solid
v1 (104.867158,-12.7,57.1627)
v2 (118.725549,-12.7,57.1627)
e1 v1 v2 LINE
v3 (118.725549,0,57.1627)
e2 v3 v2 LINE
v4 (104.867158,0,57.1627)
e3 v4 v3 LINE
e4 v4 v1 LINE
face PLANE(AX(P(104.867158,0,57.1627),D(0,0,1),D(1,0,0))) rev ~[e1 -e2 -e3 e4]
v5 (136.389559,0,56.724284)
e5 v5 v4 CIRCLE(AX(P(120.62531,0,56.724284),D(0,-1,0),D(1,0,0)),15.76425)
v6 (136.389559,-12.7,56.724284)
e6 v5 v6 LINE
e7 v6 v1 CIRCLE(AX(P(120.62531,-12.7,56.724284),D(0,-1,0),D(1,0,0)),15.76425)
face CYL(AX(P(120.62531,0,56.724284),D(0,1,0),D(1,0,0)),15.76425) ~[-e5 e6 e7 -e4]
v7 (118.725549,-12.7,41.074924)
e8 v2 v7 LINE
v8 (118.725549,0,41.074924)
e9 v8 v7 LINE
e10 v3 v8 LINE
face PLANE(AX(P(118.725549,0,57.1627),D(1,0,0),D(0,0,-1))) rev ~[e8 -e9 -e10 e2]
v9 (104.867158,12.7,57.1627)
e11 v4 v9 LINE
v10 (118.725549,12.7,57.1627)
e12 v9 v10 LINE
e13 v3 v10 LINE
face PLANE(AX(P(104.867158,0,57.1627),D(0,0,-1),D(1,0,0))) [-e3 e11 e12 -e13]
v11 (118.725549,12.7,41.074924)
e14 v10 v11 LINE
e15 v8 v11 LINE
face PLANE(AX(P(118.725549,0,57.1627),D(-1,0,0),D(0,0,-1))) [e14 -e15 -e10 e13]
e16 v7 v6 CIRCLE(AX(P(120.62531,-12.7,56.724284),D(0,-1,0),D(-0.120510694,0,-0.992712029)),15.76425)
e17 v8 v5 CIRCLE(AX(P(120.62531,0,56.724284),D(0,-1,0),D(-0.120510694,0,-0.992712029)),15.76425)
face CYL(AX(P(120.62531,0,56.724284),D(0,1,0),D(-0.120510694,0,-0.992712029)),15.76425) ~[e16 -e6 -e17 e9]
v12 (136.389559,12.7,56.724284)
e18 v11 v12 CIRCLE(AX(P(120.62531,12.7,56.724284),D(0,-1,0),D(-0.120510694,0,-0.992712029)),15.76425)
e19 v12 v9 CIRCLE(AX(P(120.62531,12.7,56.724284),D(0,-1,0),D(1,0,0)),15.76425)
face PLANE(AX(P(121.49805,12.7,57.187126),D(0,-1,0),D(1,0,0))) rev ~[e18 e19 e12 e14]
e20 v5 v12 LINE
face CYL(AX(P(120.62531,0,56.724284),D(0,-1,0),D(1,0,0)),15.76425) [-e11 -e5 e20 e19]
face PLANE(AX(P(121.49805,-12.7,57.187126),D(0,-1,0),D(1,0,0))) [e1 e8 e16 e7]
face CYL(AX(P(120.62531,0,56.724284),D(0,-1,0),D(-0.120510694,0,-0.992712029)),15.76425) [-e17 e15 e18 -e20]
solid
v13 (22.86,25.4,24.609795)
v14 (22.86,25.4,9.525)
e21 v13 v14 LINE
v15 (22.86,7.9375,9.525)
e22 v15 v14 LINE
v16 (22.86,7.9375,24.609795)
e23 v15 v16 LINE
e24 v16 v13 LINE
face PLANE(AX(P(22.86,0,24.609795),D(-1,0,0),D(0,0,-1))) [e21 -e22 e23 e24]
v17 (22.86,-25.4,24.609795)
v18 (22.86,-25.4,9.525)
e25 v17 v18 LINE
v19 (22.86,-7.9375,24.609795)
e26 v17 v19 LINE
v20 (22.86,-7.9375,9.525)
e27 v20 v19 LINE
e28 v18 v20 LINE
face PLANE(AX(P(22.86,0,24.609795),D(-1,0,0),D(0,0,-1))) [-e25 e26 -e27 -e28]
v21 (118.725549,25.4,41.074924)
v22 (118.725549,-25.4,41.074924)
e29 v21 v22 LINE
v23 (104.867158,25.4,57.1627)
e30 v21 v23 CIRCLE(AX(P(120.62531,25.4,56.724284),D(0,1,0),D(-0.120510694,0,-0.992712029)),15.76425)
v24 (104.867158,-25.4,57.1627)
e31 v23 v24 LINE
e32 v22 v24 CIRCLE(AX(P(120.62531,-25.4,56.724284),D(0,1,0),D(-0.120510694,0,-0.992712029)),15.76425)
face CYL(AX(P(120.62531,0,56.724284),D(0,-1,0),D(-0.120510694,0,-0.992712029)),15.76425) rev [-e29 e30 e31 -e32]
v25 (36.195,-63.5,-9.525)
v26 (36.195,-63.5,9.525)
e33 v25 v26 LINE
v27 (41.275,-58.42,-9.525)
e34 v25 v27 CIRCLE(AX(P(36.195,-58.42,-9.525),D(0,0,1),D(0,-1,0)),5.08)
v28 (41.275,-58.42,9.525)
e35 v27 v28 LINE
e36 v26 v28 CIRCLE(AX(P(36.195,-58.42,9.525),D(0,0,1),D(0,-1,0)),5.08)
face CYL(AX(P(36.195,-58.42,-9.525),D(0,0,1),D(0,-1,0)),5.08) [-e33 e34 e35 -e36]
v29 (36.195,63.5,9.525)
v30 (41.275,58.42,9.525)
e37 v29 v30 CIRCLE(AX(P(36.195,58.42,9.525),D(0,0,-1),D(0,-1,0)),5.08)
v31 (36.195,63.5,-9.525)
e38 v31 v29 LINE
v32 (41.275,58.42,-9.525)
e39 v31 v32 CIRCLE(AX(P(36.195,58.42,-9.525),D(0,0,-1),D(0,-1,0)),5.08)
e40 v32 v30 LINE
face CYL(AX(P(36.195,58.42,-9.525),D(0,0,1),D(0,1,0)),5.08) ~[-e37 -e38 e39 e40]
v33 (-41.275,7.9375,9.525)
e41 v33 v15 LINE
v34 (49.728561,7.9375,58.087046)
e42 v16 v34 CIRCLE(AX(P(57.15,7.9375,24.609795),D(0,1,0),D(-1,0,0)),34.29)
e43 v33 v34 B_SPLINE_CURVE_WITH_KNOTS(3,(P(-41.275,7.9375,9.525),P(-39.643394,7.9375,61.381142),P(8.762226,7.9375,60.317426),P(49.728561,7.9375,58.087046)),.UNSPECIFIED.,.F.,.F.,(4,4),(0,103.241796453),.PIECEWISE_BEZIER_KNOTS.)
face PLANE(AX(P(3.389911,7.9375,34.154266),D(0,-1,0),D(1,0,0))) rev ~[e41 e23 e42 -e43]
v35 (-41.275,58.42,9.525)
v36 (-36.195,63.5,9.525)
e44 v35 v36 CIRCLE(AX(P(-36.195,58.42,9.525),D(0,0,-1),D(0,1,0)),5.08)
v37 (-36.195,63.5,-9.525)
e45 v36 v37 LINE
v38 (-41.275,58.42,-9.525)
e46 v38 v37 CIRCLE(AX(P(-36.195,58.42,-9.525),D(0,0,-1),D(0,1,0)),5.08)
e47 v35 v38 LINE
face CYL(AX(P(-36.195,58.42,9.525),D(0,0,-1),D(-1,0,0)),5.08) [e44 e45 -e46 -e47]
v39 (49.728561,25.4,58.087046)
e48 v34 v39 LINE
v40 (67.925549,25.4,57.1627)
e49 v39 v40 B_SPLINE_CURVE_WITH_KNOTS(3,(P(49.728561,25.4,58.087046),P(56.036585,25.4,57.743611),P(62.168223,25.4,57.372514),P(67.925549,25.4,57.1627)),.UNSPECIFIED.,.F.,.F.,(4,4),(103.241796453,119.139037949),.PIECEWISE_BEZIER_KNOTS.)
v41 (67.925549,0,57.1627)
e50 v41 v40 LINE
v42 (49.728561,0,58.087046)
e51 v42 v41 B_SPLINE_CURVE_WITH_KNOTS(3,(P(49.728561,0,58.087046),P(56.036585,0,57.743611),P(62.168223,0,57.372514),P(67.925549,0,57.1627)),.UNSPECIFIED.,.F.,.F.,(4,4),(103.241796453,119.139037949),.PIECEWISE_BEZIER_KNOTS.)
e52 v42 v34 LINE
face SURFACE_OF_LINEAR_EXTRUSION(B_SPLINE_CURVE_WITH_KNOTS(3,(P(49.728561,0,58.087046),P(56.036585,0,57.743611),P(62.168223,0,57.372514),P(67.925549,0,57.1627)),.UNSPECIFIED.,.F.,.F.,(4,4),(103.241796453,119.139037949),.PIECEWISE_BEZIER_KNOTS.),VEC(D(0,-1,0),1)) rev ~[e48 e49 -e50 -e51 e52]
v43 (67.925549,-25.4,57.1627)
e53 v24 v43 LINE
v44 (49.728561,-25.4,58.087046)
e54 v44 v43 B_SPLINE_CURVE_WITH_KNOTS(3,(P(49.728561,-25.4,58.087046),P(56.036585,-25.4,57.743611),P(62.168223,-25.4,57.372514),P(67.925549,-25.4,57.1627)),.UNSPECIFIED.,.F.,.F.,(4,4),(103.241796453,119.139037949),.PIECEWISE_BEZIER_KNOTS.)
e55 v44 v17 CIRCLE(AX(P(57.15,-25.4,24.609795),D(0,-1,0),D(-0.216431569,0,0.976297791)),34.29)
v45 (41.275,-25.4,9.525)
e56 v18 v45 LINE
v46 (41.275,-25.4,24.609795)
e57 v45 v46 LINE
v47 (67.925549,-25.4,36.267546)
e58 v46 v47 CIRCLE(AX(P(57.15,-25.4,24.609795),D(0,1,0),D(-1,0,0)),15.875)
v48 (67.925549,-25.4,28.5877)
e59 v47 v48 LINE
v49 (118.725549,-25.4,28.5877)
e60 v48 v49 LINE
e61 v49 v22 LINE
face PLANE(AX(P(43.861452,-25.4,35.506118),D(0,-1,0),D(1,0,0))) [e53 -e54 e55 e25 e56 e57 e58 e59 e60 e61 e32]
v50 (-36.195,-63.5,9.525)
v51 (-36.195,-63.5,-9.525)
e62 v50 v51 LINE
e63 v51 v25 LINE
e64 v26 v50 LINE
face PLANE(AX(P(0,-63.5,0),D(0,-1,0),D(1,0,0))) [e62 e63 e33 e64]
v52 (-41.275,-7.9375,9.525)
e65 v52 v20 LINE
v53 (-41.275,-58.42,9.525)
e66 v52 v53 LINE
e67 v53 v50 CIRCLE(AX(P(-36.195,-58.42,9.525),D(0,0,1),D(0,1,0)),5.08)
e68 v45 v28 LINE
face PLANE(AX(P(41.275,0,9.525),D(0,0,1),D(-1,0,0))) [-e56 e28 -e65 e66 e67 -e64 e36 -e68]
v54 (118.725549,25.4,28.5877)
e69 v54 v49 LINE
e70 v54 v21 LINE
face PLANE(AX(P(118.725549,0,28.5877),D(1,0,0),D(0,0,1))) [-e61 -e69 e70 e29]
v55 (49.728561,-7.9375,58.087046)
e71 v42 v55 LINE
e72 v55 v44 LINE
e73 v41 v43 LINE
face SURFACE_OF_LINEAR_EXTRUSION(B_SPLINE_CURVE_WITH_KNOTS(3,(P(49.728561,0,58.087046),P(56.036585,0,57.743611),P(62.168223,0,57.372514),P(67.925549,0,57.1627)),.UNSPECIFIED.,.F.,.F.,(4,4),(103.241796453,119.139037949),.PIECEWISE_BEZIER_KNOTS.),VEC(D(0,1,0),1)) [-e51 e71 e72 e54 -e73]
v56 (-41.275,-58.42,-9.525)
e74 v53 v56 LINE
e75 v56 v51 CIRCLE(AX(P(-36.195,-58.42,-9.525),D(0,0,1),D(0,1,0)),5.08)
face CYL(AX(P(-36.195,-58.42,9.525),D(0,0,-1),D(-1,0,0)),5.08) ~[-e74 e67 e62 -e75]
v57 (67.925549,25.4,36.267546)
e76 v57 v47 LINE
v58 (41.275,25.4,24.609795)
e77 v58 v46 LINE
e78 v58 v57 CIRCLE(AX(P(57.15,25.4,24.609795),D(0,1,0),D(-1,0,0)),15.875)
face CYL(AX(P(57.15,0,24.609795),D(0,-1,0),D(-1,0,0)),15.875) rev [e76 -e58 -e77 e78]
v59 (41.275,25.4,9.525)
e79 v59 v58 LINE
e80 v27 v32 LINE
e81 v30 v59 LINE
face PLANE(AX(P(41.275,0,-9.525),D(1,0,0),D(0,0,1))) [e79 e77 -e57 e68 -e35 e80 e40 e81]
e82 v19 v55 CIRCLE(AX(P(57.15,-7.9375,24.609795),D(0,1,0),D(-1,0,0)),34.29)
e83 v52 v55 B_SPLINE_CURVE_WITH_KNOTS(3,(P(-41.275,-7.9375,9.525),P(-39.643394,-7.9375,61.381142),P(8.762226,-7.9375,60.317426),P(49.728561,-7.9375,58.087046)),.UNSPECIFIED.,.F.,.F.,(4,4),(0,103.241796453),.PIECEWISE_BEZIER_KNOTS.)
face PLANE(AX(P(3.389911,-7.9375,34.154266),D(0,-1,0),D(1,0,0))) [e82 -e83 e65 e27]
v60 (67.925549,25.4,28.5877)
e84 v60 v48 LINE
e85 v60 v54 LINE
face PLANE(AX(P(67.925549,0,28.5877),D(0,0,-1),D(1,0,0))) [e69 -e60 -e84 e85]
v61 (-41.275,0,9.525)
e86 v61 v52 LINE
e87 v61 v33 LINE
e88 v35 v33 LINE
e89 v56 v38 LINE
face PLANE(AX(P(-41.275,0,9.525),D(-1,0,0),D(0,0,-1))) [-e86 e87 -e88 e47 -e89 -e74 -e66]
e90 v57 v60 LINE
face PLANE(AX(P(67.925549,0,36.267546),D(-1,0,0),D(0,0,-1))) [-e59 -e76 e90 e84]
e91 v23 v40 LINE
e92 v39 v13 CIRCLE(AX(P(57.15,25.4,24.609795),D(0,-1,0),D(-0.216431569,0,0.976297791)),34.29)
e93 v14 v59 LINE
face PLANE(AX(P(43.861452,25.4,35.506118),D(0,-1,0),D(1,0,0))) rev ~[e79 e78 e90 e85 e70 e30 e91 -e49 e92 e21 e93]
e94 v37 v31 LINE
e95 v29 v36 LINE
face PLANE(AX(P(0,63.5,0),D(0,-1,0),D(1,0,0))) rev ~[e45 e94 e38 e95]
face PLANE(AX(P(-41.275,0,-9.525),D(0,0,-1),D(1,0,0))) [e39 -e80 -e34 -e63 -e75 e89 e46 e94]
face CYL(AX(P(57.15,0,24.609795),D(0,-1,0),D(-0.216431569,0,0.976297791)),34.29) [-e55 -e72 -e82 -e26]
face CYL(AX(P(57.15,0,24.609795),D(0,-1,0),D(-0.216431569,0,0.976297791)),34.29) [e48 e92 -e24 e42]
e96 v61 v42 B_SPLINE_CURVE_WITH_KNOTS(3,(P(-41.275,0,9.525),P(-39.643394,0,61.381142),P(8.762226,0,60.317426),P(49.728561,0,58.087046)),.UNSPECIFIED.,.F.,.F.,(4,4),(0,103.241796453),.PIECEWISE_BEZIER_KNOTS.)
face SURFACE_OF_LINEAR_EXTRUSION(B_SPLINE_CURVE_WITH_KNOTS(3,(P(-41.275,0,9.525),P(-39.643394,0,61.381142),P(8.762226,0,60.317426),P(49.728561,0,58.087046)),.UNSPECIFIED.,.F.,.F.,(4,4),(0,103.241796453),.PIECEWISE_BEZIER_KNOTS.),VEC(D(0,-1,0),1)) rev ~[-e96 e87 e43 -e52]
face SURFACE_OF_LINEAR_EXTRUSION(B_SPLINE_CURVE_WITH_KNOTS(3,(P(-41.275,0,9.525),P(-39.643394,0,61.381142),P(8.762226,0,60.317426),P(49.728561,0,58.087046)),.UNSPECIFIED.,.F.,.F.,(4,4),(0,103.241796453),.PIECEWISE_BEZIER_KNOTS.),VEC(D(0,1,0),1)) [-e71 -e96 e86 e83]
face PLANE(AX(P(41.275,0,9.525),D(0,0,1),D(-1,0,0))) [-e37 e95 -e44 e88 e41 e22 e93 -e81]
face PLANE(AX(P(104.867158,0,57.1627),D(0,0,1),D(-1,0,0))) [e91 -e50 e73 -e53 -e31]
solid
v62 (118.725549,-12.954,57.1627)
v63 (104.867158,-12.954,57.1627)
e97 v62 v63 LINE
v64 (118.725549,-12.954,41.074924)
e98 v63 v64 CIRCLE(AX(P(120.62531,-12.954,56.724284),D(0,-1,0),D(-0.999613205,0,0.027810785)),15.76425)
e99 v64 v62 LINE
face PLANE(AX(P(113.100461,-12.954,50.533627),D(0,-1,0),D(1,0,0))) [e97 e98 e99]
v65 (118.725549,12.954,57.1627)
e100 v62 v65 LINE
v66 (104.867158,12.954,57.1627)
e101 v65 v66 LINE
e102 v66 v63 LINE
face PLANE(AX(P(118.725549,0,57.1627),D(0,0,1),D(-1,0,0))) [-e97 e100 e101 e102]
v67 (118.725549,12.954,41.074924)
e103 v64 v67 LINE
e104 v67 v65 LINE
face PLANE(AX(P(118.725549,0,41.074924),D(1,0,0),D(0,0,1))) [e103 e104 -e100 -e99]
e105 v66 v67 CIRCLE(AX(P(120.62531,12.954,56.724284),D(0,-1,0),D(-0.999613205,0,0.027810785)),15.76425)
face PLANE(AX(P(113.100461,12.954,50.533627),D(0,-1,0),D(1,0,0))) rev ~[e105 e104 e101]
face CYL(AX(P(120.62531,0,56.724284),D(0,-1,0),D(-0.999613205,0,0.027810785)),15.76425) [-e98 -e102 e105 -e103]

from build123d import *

# Parameters (mm, degrees)
F1_DEPTH = 63.5
F2_DEPTH = 25.4
F3_DEPTH = 7.9375
F4_R     = 5.08
F5_DEPTH = 12.7
F6_DEPTH = 12.954


# Not quite as in the source:
# - a feature names something its author has since deleted; it is built from what else it names


with BuildPart() as f1:
    # F0 (on Front) → F1 (new body, symmetric)
    with BuildSketch(Plane.XZ):
        Polygon((41.275, -9.525), (41.275, 9.525), (22.86, 9.525), (-41.275, 9.525), (-41.275, -9.525), align=None)
    extrude(amount=F1_DEPTH, both=True)

    # F0 (on Front) → F2 (join, symmetric)
    with BuildSketch(Plane.XZ):
        with BuildLine():
            Line((22.86, 9.525), (41.275, 9.525))
            Line((41.275, 9.525), (41.275, 24.6097946961))
            ThreePointArc((41.275, 24.6097946961), (50.7878547404, 39.1541658648), (67.925549001, 36.2675461399))
            Line((67.925549001, 36.2675461399), (67.925549001, 57.1627))
            add(Edge.make_bspline(
                [(49.7285614833, 58.0870459324), (56.0365853953, 57.7436105447), (62.1682234861, 57.3725135069), (67.925549001, 57.1627)],
                knots=[103.2417964532, 103.2417964532, 103.2417964532, 103.2417964532, 119.139037949, 119.139037949, 119.139037949, 119.139037949], degree=3))
            ThreePointArc((49.7285614833, 58.0870459324), (30.4078494999, 46.0728207323), (22.86, 24.6097946961))
            Line((22.86, 24.6097946961), (22.86, 9.525))
        make_face()
        with BuildLine():
            Line((67.925549001, 57.1627), (67.925549001, 36.2675461399))
            Line((67.925549001, 36.2675461399), (67.925549001, 28.5877))
            Line((67.925549001, 28.5877), (118.725549001, 28.5877))
            Line((118.725549001, 28.5877), (118.725549001, 41.0749236981))
            ThreePointArc((118.725549001, 41.0749236981), (108.6814992651, 46.435602827), (104.8671576362, 57.1627))
            Line((104.8671576362, 57.1627), (67.925549001, 57.1627))
        make_face()
    extrude(amount=F2_DEPTH, both=True)

    # F0 (on Front) → F3 (join, symmetric)
    with BuildSketch(Plane.XZ):
        with BuildLine():
            Line((-41.275, 9.525), (22.86, 9.525))
            Line((22.86, 9.525), (22.86, 24.6097946961))
            ThreePointArc((22.86, 24.6097946961), (30.4078494999, 46.0728207323), (49.7285614833, 58.0870459324))
            add(Edge.make_bspline(
                [(-41.275, 9.525), (-39.6433941578, 61.3811419555), (8.7622264795, 60.3174257381), (49.7285614833, 58.0870459324)],
                knots=[0, 0, 0, 0, 103.2417964532, 103.2417964532, 103.2417964532, 103.2417964532], degree=3))
        make_face()
    extrude(amount=F3_DEPTH, both=True)

    # F4
    f4_edges = [f1.edges().sort_by_distance(p)[0] for p in [
        (-41.275, -63.5, 0),
        (41.275, -63.5, 0),
        (41.275, 63.5, 0),
        (-41.275, 63.5, 0),
    ]]
    fillet(f4_edges, radius=F4_R)


with BuildPart() as f5:
    # F0 (on Front) → F5 (new body, symmetric)
    with BuildSketch(Plane.XZ):
        with BuildLine():
            ThreePointArc((136.389559184, 56.7242838442), (120.8445389242, 72.4870089264), (104.8671576362, 57.1627))
            Line((104.8671576362, 57.1627), (118.725549001, 57.1627))
            Line((118.725549001, 57.1627), (118.725549001, 41.0749236981))
            ThreePointArc((118.725549001, 41.0749236981), (131.0790951476, 44.9247104544), (136.389559184, 56.7242838442))
        make_face()
    extrude(amount=F5_DEPTH, both=True)


with BuildPart() as f6:
    # F0 (on Front) → F6 (new body, symmetric)
    with BuildSketch(Plane.XZ):
        with BuildLine():
            Line((118.725549001, 57.1627), (104.8671576362, 57.1627))
            ThreePointArc((104.8671576362, 57.1627), (108.6814992651, 46.435602827), (118.725549001, 41.0749236981))
            Line((118.725549001, 41.0749236981), (118.725549001, 57.1627))
        make_face()
    extrude(amount=F6_DEPTH, both=True)


solid = Compound([f1.part, f5.part, f6.part])
